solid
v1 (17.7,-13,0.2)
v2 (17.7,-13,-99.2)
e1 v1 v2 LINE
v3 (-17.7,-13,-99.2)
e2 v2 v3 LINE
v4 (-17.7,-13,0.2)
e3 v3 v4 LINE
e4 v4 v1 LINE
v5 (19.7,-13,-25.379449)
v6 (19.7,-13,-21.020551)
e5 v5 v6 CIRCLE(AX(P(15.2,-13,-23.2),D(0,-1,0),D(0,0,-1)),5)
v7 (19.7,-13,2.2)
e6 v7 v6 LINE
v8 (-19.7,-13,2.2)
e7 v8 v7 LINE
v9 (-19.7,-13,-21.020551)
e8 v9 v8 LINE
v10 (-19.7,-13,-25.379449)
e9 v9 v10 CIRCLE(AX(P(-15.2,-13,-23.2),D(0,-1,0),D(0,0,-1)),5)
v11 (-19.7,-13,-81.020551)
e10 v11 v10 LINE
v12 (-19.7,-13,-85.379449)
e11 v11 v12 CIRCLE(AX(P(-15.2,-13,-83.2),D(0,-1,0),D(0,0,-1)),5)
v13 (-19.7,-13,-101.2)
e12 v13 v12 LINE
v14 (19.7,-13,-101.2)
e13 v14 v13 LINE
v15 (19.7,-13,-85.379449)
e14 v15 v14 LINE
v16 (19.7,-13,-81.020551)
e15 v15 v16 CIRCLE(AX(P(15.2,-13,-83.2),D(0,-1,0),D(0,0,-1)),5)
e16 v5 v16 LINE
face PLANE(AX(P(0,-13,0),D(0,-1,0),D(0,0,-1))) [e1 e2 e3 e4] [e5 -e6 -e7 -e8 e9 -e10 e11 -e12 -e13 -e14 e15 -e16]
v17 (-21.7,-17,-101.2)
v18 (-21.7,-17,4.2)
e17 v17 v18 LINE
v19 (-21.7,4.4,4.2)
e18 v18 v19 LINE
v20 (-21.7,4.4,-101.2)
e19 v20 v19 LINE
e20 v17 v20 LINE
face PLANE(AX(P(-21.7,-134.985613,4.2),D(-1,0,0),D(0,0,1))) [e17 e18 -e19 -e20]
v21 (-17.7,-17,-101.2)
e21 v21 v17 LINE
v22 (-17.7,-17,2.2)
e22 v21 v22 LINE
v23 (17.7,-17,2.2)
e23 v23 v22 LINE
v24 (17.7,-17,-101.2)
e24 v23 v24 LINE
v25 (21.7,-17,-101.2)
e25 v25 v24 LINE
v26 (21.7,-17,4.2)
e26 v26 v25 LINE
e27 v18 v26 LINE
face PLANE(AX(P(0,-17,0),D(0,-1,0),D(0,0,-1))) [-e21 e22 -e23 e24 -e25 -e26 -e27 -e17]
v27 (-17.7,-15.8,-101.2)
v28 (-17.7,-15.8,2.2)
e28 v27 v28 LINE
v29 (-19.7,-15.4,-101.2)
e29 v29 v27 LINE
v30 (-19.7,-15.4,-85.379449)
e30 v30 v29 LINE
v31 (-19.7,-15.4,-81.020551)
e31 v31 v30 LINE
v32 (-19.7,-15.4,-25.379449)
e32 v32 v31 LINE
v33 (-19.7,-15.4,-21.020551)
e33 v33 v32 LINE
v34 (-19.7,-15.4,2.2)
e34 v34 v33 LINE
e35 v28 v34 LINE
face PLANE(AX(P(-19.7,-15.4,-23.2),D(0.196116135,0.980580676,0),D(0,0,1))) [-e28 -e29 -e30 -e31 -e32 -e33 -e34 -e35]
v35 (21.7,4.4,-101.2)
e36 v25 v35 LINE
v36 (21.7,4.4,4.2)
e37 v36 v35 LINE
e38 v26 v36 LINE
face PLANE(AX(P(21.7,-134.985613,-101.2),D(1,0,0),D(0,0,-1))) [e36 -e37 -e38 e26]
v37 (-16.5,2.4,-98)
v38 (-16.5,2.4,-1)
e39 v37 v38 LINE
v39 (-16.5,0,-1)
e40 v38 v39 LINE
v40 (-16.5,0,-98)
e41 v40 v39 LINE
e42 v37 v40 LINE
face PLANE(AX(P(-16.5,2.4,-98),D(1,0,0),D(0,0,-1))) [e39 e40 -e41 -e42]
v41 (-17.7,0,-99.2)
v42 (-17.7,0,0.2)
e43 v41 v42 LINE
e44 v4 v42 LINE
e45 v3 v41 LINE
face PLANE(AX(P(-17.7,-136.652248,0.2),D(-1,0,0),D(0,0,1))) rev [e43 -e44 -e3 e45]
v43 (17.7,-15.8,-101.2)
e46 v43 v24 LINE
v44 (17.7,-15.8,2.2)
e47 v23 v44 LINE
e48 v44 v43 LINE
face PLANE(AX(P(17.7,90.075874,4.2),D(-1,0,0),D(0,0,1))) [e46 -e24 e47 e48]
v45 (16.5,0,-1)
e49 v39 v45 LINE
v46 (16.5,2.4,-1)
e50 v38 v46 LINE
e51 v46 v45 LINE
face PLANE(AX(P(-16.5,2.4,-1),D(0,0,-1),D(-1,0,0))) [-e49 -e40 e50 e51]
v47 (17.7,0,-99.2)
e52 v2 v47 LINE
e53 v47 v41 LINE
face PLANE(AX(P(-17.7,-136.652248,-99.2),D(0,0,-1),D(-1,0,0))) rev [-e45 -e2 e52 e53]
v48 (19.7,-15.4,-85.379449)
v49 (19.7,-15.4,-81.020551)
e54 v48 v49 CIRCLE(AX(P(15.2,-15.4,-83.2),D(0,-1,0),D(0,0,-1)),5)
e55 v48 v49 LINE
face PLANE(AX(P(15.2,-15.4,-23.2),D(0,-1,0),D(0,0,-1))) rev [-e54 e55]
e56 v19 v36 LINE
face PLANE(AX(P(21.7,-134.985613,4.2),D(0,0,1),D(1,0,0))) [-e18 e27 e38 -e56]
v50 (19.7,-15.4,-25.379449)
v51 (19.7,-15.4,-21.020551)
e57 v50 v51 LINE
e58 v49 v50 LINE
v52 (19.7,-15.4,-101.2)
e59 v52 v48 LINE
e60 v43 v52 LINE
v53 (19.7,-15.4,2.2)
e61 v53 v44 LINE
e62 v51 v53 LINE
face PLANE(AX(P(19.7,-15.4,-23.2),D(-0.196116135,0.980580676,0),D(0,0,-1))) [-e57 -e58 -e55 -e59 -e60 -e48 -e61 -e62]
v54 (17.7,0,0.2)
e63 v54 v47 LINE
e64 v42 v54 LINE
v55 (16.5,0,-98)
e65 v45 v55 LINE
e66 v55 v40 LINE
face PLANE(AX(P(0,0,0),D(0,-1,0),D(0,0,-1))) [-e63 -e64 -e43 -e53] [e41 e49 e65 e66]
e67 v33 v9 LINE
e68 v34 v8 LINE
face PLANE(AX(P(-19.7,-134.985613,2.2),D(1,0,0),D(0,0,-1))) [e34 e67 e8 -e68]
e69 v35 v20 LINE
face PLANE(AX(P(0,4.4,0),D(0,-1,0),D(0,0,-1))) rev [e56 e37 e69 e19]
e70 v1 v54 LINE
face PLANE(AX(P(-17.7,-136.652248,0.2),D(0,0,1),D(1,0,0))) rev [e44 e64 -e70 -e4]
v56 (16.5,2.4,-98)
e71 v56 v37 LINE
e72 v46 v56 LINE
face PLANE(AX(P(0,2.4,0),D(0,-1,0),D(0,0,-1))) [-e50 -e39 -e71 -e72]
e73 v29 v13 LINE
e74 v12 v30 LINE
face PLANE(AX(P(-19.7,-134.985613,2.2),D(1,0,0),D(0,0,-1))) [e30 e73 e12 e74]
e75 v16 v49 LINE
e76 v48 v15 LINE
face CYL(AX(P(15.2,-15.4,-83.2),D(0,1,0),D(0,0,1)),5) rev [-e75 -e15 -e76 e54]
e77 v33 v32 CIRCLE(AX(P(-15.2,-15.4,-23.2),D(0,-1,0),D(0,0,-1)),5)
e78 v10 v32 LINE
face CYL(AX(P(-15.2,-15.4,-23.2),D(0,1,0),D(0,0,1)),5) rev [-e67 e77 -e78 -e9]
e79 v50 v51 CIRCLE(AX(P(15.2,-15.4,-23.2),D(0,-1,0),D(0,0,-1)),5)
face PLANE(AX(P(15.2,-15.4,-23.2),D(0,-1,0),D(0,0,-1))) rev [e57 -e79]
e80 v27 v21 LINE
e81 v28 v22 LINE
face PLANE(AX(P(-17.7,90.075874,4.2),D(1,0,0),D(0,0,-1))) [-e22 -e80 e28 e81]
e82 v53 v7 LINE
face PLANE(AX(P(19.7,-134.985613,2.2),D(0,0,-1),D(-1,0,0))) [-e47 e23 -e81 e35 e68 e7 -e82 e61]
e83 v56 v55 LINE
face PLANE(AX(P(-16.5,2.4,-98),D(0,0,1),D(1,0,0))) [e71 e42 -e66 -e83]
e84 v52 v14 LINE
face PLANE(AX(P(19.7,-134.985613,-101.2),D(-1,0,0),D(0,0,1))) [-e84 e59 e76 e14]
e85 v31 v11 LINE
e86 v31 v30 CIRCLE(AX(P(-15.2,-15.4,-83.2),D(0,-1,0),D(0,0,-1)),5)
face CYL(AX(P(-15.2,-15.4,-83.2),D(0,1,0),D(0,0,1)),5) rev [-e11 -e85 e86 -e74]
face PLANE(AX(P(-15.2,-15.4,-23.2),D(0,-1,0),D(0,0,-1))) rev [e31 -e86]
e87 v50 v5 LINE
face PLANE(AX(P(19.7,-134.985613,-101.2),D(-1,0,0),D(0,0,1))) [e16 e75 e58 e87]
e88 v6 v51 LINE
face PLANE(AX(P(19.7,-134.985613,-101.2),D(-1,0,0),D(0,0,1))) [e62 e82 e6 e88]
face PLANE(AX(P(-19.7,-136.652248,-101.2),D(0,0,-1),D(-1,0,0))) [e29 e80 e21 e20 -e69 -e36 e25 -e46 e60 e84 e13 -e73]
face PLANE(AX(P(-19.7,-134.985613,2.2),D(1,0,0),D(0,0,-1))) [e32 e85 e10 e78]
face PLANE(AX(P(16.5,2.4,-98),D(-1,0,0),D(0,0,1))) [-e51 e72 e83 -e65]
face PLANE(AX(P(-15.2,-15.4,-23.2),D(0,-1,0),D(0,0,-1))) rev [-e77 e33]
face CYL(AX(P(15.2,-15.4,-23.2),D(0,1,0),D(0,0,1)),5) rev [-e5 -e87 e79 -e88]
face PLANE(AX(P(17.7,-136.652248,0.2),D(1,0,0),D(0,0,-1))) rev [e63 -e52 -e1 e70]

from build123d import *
from OCP.BRepFilletAPI import BRepFilletAPI_MakeChamfer

# Parameters (mm, degrees)
SKETCH1_W           = 35.4
SKETCH1_H           = 99.4
SKETCH1_W_2         = 33
SKETCH1_H_2         = 97
BOSS_EXTRUDE1_DEPTH = 2.4
SKETCH2_W           = 39.4
SKETCH2_H           = 103.4
SKETCH2_W_2         = 35.4
SKETCH2_H_2         = 99.4
BOSS_EXTRUDE3_DEPTH = 15.4
SKETCH3_W           = 39.4
SKETCH3_H           = 103.4
BOSS_EXTRUDE4_DEPTH = 2
BOSS_EXTRUDE5_DEPTH = 21.4
SKETCH5_R           = 5
CUT_EXTRUDE1_DEPTH  = 2.4
SKETCH6_W           = 4
SKETCH6_H           = 105.4
BOSS_EXTRUDE6_DEPTH = 1.6
CHAMFER1_SIZE       = 0.4
CHAMFER1_SIZE_2     = 2


with BuildPart() as part:
    # Sketch1 → Boss-Extrude1 (new body)
    with BuildSketch(Plane(origin=(0, 0, 0), x_dir=(1, 0, 0), z_dir=(0, 1, 0))):
        with Locations((0, 49.5)):
            Rectangle(SKETCH1_W, SKETCH1_H)
        with Locations((0, 49.5)):
            Rectangle(SKETCH1_W_2, SKETCH1_H_2, mode=Mode.SUBTRACT)
    extrude(amount=BOSS_EXTRUDE1_DEPTH)

    # Sketch2 → Boss-Extrude3 (add)
    with BuildSketch(Plane(origin=(0, 2.4, 0), x_dir=(1, 0, 0), z_dir=(0, 1, 0))):
        with Locations((0, 49.5)):
            Rectangle(SKETCH2_W, SKETCH2_H)
        with Locations((0, 49.5)):
            Rectangle(SKETCH2_W_2, SKETCH2_H_2, mode=Mode.SUBTRACT)
    extrude(amount=-BOSS_EXTRUDE3_DEPTH)

    # Sketch3 → Boss-Extrude4 (add)
    with BuildSketch(Plane(origin=(0, 2.4, 0), x_dir=(1, 0, 0), z_dir=(0, 1, 0))):
        with Locations((0, 49.5)):
            Rectangle(SKETCH3_W, SKETCH3_H)
    extrude(amount=BOSS_EXTRUDE4_DEPTH)

    # Sketch4 → Boss-Extrude5 (add)
    with BuildSketch(Plane(origin=(0, 4.4, 0), x_dir=(1, 0, 0), z_dir=(0, 1, 0))):
        Polygon((21.7, 101.2), (21.7, -4.2), (-21.7, -4.2), (-21.7, 101.2), (-19.7, 101.2), (-19.7, -2.2), (19.7, -2.2), (19.7, 101.2), align=None)
    extrude(amount=-BOSS_EXTRUDE5_DEPTH)

    # Sketch5 → Cut-Extrude1 (cut)
    with BuildSketch(Plane.XZ.offset(13)):
        with Locations((-15.2, -23.2)):
            Circle(SKETCH5_R)
        with Locations((15.2, -23.2)):
            Circle(SKETCH5_R)
        with Locations((15.2, -83.2)):
            Circle(SKETCH5_R)
        with Locations((-15.2, -83.2)):
            Circle(SKETCH5_R)
    extrude(amount=CUT_EXTRUDE1_DEPTH, mode=Mode.SUBTRACT)

    # Sketch6 → Boss-Extrude6 (add)
    with BuildSketch(Plane.XZ.offset(17)):
        with Locations((-19.7, -48.5)):
            Rectangle(SKETCH6_W, SKETCH6_H)
        with Locations((19.7, -48.5)):
            Rectangle(SKETCH6_W, SKETCH6_H)
    extrude(amount=-BOSS_EXTRUDE6_DEPTH)

    # Chamfer1
    chamfer1_edges_1 = [part.edges().sort_by_distance(p)[0] for p in [
        (17.7, -15.4, -49.5),
    ]]
    chamfer1_side_1 = [part.faces().sort_by_distance(p)[0] for p in [
        (17.7, -15.408, -49.5),
    ]]
    chamfer1_edges_2 = [part.edges().sort_by_distance(p)[0] for p in [
        (-17.7, -15.4, -49.5),
    ]]
    chamfer1_side_2 = [part.faces().sort_by_distance(p)[0] for p in [
        (-17.708, -15.4, -49.5),
    ]]
    chamfer1 = BRepFilletAPI_MakeChamfer(part.part.solid().wrapped)
    for e in chamfer1_edges_1:
        chamfer1.Add(CHAMFER1_SIZE - 0.0001, CHAMFER1_SIZE_2 - 0.0001, e.wrapped, chamfer1_side_1[0].wrapped)
    for e in chamfer1_edges_2:
        chamfer1.Add(CHAMFER1_SIZE_2 - 0.0001, CHAMFER1_SIZE - 0.0001, e.wrapped, chamfer1_side_2[0].wrapped)
    add(Compound.cast(chamfer1.Shape()), mode=Mode.REPLACE)  # a hair under: the kernel refuses the full size


solid = part.part
